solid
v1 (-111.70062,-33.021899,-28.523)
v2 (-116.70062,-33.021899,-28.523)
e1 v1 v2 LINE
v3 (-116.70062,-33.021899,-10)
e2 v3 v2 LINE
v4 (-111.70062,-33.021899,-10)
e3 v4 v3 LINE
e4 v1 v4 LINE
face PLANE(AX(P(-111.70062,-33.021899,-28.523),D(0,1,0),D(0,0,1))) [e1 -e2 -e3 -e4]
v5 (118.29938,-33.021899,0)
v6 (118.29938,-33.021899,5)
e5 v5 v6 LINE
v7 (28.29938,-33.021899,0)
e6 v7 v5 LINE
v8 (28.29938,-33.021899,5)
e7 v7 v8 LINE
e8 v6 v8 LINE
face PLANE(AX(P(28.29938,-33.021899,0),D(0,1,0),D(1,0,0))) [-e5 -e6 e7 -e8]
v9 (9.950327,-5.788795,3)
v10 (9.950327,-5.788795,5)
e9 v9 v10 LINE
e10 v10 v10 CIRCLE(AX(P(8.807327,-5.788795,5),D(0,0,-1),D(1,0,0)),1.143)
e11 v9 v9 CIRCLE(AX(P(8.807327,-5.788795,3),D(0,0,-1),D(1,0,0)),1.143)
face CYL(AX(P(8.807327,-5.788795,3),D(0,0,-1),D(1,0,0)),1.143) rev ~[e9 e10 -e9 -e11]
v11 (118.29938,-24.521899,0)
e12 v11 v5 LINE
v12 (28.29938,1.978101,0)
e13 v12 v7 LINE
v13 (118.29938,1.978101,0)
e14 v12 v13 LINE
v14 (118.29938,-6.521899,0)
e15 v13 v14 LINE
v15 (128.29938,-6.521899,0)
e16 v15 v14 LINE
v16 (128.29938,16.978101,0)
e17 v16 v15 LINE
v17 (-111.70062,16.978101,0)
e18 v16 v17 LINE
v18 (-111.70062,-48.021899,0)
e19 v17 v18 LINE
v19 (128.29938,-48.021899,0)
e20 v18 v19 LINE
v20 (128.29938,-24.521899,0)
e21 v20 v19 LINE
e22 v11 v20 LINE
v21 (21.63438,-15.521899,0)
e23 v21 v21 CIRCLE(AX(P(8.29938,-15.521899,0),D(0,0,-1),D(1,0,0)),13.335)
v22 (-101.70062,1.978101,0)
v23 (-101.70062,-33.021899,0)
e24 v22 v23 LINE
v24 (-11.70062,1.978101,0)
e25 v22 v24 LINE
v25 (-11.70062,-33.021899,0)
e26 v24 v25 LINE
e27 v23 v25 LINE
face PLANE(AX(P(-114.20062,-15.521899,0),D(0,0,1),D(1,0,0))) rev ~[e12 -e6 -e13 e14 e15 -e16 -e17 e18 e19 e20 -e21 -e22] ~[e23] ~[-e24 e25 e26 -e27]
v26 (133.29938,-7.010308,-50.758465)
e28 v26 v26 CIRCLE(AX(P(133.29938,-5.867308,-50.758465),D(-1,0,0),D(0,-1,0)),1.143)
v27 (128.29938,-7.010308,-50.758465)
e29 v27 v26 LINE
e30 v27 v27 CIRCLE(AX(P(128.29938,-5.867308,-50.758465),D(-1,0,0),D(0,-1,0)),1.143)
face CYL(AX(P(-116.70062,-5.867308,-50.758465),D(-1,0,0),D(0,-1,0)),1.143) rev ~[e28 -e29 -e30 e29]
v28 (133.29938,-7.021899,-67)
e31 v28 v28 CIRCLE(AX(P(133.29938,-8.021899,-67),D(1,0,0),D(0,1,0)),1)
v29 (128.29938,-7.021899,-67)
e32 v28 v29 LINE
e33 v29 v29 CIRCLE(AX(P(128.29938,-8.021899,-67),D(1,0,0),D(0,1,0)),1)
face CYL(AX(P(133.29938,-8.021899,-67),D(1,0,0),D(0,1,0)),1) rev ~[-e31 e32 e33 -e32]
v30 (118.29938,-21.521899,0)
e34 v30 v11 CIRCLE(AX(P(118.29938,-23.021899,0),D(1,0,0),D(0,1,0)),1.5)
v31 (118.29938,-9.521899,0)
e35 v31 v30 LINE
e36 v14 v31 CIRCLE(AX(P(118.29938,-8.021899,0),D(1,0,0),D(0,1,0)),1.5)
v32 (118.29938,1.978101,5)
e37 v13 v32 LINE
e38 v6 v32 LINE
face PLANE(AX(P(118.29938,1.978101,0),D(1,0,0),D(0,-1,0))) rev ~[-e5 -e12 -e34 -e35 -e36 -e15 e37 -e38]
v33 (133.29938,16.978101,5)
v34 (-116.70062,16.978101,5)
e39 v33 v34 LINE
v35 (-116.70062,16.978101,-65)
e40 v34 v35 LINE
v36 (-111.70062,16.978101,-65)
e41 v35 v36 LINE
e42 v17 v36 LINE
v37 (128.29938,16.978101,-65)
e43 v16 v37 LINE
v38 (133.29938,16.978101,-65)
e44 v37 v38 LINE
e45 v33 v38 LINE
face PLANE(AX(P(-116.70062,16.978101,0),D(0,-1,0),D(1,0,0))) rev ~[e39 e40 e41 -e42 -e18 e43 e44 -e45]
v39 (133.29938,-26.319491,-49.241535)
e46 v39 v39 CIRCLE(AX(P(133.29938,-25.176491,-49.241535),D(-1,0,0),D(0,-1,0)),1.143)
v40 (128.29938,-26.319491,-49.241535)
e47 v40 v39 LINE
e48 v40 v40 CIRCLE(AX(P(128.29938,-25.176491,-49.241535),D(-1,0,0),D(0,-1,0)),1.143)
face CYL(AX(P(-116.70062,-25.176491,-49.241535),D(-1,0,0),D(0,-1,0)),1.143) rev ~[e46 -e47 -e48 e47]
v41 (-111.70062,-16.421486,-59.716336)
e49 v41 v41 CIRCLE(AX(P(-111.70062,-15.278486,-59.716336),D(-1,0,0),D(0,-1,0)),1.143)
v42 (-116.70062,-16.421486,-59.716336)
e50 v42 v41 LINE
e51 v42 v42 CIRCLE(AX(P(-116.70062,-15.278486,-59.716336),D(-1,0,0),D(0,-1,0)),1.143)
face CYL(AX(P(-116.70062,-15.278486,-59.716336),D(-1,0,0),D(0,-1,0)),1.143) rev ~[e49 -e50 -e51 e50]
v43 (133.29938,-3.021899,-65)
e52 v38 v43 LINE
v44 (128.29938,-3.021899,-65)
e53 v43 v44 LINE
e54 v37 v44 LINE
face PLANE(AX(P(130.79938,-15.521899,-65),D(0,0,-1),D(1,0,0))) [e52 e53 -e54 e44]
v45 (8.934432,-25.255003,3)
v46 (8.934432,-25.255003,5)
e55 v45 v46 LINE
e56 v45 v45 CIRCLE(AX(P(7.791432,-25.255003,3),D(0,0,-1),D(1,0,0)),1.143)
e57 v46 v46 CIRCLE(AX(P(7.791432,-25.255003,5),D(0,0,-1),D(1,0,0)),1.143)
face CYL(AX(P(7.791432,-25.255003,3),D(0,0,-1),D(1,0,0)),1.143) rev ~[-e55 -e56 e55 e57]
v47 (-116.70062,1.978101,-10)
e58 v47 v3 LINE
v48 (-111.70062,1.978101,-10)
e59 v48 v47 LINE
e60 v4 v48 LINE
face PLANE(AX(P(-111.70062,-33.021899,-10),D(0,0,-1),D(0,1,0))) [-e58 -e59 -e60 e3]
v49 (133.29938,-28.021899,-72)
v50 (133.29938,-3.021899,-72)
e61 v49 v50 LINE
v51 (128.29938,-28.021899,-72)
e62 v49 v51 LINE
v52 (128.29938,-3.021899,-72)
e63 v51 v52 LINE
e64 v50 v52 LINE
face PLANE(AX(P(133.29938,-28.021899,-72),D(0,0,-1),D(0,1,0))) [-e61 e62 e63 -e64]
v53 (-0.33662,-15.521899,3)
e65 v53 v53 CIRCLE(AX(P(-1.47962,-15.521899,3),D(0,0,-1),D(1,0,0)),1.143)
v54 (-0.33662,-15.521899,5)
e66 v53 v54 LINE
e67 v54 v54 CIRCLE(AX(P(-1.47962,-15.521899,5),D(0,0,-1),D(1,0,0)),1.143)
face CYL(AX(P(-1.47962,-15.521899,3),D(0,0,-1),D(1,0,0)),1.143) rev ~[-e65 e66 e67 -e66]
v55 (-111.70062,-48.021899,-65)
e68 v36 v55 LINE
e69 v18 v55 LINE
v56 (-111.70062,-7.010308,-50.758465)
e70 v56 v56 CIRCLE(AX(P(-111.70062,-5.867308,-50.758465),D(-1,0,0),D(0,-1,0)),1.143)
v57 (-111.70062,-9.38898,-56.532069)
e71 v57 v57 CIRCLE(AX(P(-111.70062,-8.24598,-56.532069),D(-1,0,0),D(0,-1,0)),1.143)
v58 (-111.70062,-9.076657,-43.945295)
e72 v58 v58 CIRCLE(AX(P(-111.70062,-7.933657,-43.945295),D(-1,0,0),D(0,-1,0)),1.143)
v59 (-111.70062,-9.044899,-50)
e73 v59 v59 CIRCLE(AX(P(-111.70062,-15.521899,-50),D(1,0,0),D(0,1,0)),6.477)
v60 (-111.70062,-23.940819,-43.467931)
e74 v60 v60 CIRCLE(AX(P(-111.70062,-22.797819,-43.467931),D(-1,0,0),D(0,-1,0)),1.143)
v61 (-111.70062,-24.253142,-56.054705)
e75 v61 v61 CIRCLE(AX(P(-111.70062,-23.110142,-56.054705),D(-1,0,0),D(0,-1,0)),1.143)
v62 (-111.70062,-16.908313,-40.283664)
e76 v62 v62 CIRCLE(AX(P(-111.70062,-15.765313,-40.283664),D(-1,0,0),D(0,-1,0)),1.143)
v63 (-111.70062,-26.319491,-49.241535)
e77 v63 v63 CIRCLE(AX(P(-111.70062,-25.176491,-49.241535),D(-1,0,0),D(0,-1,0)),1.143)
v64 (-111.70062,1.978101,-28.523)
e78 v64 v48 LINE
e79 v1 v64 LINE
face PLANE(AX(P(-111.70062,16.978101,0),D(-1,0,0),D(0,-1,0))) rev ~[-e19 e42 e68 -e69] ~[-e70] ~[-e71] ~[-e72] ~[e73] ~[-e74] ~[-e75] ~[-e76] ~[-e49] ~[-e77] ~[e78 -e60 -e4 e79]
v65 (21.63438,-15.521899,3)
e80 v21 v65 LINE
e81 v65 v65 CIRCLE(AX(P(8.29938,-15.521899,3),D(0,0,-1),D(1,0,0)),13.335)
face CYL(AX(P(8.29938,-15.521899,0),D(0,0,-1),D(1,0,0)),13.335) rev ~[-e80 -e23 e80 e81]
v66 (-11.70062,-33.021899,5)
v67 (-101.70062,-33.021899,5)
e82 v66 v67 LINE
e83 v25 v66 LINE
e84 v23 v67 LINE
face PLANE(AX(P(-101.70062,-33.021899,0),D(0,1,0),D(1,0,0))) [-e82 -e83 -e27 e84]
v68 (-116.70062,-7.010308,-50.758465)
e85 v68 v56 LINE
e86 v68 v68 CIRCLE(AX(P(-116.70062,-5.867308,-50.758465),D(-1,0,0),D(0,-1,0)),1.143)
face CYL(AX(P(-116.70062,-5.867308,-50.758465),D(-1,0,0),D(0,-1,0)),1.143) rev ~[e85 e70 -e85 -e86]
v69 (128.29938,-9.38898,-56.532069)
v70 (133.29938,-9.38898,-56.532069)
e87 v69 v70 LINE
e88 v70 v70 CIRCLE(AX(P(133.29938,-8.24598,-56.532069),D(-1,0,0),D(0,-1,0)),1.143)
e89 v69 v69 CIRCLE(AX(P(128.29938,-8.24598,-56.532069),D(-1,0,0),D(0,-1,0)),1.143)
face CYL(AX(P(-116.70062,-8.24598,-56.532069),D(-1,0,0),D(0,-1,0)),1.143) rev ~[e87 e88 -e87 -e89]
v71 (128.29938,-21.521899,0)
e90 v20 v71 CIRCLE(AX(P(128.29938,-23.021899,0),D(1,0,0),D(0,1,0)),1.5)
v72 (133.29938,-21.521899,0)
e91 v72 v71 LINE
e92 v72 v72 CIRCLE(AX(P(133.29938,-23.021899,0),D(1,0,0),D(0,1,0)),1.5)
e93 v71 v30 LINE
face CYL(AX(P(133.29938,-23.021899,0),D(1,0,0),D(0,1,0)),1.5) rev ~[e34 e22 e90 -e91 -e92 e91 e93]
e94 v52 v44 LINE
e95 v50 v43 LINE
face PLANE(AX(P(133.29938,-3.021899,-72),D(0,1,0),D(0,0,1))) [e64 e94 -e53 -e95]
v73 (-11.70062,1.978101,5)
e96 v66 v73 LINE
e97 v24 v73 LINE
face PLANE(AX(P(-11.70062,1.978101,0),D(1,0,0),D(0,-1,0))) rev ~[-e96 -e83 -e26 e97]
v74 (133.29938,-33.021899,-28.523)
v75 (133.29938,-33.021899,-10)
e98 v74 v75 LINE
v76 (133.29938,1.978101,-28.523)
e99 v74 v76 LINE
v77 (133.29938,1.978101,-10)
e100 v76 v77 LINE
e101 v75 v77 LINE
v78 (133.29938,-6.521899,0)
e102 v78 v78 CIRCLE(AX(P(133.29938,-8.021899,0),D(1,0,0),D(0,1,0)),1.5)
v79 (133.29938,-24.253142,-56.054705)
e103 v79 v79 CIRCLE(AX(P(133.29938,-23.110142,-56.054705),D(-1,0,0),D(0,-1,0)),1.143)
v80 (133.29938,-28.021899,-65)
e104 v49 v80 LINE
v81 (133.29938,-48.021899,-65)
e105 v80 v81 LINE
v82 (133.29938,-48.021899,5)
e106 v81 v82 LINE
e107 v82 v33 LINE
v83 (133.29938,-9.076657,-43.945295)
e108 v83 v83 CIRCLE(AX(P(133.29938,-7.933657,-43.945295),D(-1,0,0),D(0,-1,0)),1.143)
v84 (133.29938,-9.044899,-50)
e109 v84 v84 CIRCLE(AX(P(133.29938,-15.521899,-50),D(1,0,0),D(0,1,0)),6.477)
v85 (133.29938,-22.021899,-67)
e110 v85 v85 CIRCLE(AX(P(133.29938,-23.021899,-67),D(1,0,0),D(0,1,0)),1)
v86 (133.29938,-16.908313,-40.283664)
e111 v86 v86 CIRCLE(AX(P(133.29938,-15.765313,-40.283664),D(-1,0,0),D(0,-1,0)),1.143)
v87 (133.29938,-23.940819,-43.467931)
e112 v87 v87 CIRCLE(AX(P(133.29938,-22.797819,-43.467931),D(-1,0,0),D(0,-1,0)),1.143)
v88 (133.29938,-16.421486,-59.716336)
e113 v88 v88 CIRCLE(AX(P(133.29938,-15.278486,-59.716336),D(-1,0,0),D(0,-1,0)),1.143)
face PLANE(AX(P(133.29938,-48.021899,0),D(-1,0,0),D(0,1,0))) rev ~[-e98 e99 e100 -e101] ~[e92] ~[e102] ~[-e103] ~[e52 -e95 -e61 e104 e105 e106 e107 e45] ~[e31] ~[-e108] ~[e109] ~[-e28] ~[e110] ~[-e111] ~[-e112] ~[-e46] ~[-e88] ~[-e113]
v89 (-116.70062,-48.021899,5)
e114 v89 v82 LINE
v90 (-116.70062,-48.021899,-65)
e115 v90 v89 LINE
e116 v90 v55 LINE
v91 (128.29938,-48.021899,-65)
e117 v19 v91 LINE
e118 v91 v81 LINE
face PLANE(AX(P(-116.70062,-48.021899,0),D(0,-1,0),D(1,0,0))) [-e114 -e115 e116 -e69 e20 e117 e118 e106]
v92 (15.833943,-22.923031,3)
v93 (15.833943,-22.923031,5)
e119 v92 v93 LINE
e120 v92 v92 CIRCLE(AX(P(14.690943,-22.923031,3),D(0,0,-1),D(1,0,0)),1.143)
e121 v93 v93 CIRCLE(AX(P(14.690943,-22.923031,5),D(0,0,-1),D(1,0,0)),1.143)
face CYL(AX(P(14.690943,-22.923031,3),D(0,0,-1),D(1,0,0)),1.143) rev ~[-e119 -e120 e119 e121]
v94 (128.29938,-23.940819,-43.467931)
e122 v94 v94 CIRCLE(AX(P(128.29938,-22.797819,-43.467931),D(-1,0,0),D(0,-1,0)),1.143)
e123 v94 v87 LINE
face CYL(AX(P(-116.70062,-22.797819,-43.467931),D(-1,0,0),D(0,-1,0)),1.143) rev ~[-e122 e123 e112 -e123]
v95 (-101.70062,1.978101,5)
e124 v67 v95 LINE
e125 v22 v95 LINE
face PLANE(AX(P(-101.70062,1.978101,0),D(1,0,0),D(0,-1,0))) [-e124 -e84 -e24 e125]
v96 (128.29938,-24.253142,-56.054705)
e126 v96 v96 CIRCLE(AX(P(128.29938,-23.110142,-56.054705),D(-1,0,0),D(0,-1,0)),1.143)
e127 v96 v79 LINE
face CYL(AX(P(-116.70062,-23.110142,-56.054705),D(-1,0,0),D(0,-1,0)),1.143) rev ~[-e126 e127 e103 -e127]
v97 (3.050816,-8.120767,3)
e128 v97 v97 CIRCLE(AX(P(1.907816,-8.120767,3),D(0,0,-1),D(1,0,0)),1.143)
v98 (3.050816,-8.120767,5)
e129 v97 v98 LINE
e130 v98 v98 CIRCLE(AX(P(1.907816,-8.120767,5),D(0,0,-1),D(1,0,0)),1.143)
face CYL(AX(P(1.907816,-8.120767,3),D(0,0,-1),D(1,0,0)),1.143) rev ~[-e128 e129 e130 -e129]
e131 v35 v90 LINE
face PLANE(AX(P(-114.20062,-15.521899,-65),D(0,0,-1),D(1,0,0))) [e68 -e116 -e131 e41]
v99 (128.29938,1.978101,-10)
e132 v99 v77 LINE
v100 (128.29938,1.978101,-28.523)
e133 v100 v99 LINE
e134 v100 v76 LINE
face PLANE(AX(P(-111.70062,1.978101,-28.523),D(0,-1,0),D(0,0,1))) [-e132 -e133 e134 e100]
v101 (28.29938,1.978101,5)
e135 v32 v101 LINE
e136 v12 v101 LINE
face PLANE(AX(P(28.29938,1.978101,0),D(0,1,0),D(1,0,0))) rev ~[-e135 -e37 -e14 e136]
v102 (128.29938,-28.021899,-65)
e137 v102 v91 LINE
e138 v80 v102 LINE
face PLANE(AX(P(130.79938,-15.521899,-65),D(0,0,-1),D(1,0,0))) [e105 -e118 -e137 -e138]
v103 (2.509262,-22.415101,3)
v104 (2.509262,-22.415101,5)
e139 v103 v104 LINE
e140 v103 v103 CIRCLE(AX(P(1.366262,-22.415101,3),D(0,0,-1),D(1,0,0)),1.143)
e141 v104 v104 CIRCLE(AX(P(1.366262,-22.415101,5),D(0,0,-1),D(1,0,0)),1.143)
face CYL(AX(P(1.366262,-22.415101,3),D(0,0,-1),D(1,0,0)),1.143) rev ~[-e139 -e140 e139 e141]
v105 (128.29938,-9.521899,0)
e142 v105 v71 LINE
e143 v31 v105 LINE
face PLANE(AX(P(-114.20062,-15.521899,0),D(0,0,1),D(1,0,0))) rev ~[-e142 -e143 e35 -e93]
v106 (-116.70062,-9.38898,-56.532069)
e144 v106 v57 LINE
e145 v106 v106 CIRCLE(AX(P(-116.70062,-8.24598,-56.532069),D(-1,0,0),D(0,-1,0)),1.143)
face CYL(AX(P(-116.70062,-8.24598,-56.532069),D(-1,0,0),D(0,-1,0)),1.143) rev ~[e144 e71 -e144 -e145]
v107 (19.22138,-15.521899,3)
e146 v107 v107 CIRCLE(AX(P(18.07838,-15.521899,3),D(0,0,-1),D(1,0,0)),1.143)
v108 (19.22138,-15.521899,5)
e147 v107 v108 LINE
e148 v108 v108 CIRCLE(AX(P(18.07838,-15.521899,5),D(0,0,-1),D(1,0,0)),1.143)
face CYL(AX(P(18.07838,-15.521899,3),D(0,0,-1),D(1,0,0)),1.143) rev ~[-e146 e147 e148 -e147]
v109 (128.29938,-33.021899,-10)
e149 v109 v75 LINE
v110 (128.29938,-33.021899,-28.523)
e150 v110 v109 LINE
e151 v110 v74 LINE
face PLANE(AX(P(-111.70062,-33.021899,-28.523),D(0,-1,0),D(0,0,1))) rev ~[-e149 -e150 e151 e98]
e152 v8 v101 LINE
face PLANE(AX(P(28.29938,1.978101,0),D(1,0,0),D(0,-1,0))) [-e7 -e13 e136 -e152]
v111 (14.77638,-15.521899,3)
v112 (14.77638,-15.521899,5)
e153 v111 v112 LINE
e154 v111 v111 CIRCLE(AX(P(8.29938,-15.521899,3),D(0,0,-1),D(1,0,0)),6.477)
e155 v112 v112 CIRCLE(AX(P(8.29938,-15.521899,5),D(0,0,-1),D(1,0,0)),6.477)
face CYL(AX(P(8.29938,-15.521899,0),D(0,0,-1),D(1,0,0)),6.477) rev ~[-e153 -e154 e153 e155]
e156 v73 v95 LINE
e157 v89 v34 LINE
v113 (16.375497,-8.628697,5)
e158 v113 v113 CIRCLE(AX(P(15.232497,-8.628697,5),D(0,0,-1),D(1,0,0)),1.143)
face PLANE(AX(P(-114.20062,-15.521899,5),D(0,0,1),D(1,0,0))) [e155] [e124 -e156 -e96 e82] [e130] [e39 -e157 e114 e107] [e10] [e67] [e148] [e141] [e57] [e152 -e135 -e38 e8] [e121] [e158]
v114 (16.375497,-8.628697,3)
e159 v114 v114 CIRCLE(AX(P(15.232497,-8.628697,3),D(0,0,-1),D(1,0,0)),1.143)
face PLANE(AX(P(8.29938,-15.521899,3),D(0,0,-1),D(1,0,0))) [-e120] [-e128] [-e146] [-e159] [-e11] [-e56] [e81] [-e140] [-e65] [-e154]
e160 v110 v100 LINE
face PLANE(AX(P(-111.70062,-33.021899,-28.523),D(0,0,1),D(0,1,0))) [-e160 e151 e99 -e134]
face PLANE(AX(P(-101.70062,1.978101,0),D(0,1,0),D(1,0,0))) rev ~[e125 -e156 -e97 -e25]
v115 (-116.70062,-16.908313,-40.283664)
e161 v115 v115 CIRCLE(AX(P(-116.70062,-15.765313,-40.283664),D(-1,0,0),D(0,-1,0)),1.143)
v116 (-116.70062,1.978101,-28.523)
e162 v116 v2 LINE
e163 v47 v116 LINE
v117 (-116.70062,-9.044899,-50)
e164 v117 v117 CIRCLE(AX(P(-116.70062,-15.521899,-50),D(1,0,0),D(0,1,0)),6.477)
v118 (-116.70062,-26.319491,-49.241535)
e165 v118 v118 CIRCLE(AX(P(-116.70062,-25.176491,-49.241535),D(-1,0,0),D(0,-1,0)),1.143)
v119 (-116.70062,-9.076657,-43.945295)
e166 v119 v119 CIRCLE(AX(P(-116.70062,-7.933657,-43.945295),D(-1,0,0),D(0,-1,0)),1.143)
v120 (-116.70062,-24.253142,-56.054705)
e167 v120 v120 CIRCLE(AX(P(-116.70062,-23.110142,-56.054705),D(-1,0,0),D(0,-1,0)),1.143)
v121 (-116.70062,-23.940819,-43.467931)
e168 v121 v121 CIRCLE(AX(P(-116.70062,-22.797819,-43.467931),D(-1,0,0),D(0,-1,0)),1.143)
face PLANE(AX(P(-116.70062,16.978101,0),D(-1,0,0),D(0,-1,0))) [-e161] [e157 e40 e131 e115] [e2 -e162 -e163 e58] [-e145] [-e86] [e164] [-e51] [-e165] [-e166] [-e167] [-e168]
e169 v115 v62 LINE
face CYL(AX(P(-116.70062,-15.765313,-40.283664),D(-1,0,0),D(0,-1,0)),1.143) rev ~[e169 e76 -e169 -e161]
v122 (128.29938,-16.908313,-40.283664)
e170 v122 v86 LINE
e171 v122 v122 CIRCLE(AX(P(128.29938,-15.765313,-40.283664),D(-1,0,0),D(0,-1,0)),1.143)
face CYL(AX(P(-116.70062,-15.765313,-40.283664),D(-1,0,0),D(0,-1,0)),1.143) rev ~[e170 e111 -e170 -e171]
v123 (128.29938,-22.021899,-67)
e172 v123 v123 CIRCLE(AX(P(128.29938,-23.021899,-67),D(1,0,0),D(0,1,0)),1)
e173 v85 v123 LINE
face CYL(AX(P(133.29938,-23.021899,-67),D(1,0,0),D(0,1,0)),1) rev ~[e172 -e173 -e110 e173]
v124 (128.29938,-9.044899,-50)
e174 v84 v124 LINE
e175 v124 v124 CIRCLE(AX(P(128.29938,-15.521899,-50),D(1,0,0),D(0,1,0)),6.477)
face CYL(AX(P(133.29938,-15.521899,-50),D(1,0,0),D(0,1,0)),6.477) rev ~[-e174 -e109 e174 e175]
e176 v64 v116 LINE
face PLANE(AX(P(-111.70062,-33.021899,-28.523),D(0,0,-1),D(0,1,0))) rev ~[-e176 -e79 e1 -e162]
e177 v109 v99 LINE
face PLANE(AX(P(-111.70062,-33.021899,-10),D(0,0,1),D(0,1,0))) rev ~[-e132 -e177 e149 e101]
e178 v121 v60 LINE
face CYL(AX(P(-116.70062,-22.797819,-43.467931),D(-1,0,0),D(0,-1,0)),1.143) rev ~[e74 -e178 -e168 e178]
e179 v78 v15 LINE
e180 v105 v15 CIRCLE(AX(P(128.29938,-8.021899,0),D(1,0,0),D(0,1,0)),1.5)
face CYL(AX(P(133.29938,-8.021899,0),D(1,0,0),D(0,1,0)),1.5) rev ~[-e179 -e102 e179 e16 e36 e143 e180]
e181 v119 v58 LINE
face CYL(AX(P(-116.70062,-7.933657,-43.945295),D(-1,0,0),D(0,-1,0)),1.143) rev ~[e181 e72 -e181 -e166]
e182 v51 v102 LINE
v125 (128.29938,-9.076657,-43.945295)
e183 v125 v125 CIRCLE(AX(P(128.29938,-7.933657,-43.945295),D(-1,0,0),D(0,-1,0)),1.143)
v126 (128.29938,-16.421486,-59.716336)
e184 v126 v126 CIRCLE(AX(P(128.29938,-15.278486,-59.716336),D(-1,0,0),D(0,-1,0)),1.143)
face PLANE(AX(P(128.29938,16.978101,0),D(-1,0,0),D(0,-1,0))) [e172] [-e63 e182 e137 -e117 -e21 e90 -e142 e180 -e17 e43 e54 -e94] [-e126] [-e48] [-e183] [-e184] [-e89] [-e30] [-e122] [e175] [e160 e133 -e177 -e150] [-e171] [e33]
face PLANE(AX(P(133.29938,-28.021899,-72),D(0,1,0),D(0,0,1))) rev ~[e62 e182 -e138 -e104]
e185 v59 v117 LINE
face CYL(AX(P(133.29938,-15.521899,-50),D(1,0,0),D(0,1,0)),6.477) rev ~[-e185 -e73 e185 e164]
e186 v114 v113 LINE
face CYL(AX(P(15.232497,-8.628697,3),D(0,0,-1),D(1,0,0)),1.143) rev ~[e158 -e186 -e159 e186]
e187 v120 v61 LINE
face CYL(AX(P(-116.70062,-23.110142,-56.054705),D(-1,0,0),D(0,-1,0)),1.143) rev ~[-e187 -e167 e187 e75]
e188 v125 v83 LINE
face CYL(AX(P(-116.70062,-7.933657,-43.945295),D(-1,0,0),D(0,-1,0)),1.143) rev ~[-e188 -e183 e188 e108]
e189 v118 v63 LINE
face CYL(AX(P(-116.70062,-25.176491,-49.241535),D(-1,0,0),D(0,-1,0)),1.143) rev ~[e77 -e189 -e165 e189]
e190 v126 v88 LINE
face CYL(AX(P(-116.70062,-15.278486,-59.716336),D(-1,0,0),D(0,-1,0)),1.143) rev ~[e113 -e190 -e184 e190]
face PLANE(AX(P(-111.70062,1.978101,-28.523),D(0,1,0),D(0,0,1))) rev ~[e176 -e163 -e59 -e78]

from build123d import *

# Parameters (mm, degrees)
F0_W           = 5
F0_H           = 65
F0_W_2         = 240
F1_DEPTH       = 5
F2_W           = 5
F2_H           = 65
F3_DEPTH       = 65
F4_R           = 6.477
F5_DEPTH       = 250.001
F6_R           = 6.477
F7_DEPTH       = 25.4
F8_W           = 90
F8_H           = 35
F9_DEPTH       = 25.4
F10_W          = 35
F10_H          = 18.523
F11_DEPTH      = 245.001
F11_DEPTH_BACK = 25.4
F12_R          = 1.5
F13_DEPTH      = 25.4
F12_W          = 25
F12_H          = 7
F12_R_2        = 1
F14_DEPTH      = 5
F15_R          = 13.335
F15_R_2        = 6.477
F16_DEPTH      = 3
F17_R          = 1.143
F18_DEPTH      = 2.001
F19_R          = 1.143
F20_DEPTH      = 250.001


# Not quite as in the source:
# - a feature names something its author has since deleted; it is built from what else it names


with BuildPart() as f1:
    # F0 (on Top) → F1 (new body)
    with BuildSketch(Plane.XY):
        with Locations((-114.2006202787, -15.5218991437)):
            Rectangle(F0_W, F0_H)
        with Locations((130.7993797213, -15.5218991437)):
            Rectangle(F0_W, F0_H)
        with Locations((8.2993797213, -15.5218991437)):
            Rectangle(F0_W_2, F0_H)
    extrude(amount=F1_DEPTH)

    # F2 (on face) → F3 (join)
    with BuildSketch(Plane(origin=(0, 0, 0), x_dir=(1, 0, 0), z_dir=(0, 0, -1))):
        with Locations((-114.2006202787, 15.5218991437)):
            Rectangle(F2_W, F2_H)
        with Locations((130.7993797213, 15.5218991437)):
            Rectangle(F2_W, F2_H)
    extrude(amount=F3_DEPTH)

    # F4 (on face) → F5 (cut, through all)
    with BuildSketch(Plane.YZ.offset(133.2993797213)):
        with Locations((-15.5218991437, -50)):
            Circle(F4_R)
    extrude(amount=-F5_DEPTH, mode=Mode.SUBTRACT)

    # F6 (on face) → F7 (cut)
    with BuildSketch(Plane(origin=(0, 0, 0), x_dir=(1, 0, 0), z_dir=(0, 0, -1))):
        with Locations((8.2993797213, 15.5218991437)):
            Circle(F6_R)
    extrude(amount=-F7_DEPTH, mode=Mode.SUBTRACT)

    # F8 (on face) → F9 (cut)
    with BuildSketch(Plane(origin=(0, 0, 0), x_dir=(1, 0, 0), z_dir=(0, 0, -1))):
        with Locations((-56.7006202787, 15.5218991437)):
            Rectangle(F8_W, F8_H)
        with Locations((73.2993797213, 15.5218991437)):
            Rectangle(F8_W, F8_H)
    extrude(amount=-F9_DEPTH, mode=Mode.SUBTRACT)

    # F10 (on face) → F11 (cut, two sides)
    with BuildSketch(Plane.YZ.offset(-111.7006202787)) as f11_sk:
        with Locations((-15.5218991437, -19.2615)):
            Rectangle(F10_W, F10_H)
    extrude(amount=F11_DEPTH, mode=Mode.SUBTRACT)
    extrude(f11_sk.sketch, amount=-F11_DEPTH_BACK, mode=Mode.SUBTRACT)

    # F12 (on face) → F13 (cut)
    with BuildSketch(Plane.YZ.offset(133.2993797213)):
        with Locations((-23.0218991437, 0)):
            Circle(F12_R)
        with Locations((-8.0218991437, 0)):
            Circle(F12_R)
    extrude(amount=-F13_DEPTH, mode=Mode.SUBTRACT)

    # F12 (on face) → F14 (join, through all)
    with BuildSketch(Plane.YZ.offset(133.2993797213)):
        with Locations((-15.5218991437, -68.5)):
            Rectangle(F12_W, F12_H)
        with Locations((-23.0218991437, -67)):
            Circle(F12_R_2, mode=Mode.SUBTRACT)
        with Locations((-8.0218991437, -67)):
            Circle(F12_R_2, mode=Mode.SUBTRACT)
    extrude(amount=-F14_DEPTH)

    # F15 (on face) → F16 (cut)
    with BuildSketch(Plane(origin=(0, 0, 0), x_dir=(1, 0, 0), z_dir=(0, 0, -1))):
        with Locations((8.2993797213, 15.5218991437)):
            Circle(F15_R)
        with Locations((8.2993797213, 15.5218991437)):
            Circle(F15_R_2, mode=Mode.SUBTRACT)
    extrude(amount=-F16_DEPTH, mode=Mode.SUBTRACT)

    # F17 (on face) → F18 (cut, through all)
    with BuildSketch(Plane(origin=(0, 0, 3), x_dir=(1, 0, 0), z_dir=(0, 0, -1))):
        with Locations((14.6909433031, 22.9230312179)):
            Circle(F17_R)
        with Locations((18.0783797213, 15.5218991437)):
            Circle(F17_R)
        with Locations((15.2324973507, 8.6286974185)):
            Circle(F17_R)
        with Locations((8.8073272824, 5.7887949694)):
            Circle(F17_R)
        with Locations((1.9078161395, 8.1207670695)):
            Circle(F17_R)
        with Locations((-1.4796202787, 15.5218991437)):
            Circle(F17_R)
        with Locations((1.3662620919, 22.415100869)):
            Circle(F17_R)
        with Locations((7.7914321602, 25.2550033181)):
            Circle(F17_R)
    extrude(amount=-F18_DEPTH, mode=Mode.SUBTRACT)

    # F19 (on face) → F20 (cut, through all)
    with BuildSketch(Plane(origin=(-116.7006202787, 0, 0), x_dir=(0, -1, 0), z_dir=(-1, 0, 0))):
        with Locations((15.765312519, -40.2836638916)):
            Circle(F19_R)
        with Locations((25.1764905212, -49.2415353535)):
            Circle(F19_R)
        with Locations((23.1101417116, -56.0547046433)):
            Circle(F19_R)
        with Locations((15.2784857684, -59.7163361084)):
            Circle(F19_R)
        with Locations((8.2459797528, -56.5320689682)):
            Circle(F19_R)
        with Locations((5.8673077662, -50.7584646465)):
            Circle(F19_R)
        with Locations((7.9336565759, -43.9452953567)):
            Circle(F19_R)
        with Locations((22.7978185346, -43.4679310318)):
            Circle(F19_R)
    extrude(amount=-F20_DEPTH, mode=Mode.SUBTRACT)


solid = f1.part
